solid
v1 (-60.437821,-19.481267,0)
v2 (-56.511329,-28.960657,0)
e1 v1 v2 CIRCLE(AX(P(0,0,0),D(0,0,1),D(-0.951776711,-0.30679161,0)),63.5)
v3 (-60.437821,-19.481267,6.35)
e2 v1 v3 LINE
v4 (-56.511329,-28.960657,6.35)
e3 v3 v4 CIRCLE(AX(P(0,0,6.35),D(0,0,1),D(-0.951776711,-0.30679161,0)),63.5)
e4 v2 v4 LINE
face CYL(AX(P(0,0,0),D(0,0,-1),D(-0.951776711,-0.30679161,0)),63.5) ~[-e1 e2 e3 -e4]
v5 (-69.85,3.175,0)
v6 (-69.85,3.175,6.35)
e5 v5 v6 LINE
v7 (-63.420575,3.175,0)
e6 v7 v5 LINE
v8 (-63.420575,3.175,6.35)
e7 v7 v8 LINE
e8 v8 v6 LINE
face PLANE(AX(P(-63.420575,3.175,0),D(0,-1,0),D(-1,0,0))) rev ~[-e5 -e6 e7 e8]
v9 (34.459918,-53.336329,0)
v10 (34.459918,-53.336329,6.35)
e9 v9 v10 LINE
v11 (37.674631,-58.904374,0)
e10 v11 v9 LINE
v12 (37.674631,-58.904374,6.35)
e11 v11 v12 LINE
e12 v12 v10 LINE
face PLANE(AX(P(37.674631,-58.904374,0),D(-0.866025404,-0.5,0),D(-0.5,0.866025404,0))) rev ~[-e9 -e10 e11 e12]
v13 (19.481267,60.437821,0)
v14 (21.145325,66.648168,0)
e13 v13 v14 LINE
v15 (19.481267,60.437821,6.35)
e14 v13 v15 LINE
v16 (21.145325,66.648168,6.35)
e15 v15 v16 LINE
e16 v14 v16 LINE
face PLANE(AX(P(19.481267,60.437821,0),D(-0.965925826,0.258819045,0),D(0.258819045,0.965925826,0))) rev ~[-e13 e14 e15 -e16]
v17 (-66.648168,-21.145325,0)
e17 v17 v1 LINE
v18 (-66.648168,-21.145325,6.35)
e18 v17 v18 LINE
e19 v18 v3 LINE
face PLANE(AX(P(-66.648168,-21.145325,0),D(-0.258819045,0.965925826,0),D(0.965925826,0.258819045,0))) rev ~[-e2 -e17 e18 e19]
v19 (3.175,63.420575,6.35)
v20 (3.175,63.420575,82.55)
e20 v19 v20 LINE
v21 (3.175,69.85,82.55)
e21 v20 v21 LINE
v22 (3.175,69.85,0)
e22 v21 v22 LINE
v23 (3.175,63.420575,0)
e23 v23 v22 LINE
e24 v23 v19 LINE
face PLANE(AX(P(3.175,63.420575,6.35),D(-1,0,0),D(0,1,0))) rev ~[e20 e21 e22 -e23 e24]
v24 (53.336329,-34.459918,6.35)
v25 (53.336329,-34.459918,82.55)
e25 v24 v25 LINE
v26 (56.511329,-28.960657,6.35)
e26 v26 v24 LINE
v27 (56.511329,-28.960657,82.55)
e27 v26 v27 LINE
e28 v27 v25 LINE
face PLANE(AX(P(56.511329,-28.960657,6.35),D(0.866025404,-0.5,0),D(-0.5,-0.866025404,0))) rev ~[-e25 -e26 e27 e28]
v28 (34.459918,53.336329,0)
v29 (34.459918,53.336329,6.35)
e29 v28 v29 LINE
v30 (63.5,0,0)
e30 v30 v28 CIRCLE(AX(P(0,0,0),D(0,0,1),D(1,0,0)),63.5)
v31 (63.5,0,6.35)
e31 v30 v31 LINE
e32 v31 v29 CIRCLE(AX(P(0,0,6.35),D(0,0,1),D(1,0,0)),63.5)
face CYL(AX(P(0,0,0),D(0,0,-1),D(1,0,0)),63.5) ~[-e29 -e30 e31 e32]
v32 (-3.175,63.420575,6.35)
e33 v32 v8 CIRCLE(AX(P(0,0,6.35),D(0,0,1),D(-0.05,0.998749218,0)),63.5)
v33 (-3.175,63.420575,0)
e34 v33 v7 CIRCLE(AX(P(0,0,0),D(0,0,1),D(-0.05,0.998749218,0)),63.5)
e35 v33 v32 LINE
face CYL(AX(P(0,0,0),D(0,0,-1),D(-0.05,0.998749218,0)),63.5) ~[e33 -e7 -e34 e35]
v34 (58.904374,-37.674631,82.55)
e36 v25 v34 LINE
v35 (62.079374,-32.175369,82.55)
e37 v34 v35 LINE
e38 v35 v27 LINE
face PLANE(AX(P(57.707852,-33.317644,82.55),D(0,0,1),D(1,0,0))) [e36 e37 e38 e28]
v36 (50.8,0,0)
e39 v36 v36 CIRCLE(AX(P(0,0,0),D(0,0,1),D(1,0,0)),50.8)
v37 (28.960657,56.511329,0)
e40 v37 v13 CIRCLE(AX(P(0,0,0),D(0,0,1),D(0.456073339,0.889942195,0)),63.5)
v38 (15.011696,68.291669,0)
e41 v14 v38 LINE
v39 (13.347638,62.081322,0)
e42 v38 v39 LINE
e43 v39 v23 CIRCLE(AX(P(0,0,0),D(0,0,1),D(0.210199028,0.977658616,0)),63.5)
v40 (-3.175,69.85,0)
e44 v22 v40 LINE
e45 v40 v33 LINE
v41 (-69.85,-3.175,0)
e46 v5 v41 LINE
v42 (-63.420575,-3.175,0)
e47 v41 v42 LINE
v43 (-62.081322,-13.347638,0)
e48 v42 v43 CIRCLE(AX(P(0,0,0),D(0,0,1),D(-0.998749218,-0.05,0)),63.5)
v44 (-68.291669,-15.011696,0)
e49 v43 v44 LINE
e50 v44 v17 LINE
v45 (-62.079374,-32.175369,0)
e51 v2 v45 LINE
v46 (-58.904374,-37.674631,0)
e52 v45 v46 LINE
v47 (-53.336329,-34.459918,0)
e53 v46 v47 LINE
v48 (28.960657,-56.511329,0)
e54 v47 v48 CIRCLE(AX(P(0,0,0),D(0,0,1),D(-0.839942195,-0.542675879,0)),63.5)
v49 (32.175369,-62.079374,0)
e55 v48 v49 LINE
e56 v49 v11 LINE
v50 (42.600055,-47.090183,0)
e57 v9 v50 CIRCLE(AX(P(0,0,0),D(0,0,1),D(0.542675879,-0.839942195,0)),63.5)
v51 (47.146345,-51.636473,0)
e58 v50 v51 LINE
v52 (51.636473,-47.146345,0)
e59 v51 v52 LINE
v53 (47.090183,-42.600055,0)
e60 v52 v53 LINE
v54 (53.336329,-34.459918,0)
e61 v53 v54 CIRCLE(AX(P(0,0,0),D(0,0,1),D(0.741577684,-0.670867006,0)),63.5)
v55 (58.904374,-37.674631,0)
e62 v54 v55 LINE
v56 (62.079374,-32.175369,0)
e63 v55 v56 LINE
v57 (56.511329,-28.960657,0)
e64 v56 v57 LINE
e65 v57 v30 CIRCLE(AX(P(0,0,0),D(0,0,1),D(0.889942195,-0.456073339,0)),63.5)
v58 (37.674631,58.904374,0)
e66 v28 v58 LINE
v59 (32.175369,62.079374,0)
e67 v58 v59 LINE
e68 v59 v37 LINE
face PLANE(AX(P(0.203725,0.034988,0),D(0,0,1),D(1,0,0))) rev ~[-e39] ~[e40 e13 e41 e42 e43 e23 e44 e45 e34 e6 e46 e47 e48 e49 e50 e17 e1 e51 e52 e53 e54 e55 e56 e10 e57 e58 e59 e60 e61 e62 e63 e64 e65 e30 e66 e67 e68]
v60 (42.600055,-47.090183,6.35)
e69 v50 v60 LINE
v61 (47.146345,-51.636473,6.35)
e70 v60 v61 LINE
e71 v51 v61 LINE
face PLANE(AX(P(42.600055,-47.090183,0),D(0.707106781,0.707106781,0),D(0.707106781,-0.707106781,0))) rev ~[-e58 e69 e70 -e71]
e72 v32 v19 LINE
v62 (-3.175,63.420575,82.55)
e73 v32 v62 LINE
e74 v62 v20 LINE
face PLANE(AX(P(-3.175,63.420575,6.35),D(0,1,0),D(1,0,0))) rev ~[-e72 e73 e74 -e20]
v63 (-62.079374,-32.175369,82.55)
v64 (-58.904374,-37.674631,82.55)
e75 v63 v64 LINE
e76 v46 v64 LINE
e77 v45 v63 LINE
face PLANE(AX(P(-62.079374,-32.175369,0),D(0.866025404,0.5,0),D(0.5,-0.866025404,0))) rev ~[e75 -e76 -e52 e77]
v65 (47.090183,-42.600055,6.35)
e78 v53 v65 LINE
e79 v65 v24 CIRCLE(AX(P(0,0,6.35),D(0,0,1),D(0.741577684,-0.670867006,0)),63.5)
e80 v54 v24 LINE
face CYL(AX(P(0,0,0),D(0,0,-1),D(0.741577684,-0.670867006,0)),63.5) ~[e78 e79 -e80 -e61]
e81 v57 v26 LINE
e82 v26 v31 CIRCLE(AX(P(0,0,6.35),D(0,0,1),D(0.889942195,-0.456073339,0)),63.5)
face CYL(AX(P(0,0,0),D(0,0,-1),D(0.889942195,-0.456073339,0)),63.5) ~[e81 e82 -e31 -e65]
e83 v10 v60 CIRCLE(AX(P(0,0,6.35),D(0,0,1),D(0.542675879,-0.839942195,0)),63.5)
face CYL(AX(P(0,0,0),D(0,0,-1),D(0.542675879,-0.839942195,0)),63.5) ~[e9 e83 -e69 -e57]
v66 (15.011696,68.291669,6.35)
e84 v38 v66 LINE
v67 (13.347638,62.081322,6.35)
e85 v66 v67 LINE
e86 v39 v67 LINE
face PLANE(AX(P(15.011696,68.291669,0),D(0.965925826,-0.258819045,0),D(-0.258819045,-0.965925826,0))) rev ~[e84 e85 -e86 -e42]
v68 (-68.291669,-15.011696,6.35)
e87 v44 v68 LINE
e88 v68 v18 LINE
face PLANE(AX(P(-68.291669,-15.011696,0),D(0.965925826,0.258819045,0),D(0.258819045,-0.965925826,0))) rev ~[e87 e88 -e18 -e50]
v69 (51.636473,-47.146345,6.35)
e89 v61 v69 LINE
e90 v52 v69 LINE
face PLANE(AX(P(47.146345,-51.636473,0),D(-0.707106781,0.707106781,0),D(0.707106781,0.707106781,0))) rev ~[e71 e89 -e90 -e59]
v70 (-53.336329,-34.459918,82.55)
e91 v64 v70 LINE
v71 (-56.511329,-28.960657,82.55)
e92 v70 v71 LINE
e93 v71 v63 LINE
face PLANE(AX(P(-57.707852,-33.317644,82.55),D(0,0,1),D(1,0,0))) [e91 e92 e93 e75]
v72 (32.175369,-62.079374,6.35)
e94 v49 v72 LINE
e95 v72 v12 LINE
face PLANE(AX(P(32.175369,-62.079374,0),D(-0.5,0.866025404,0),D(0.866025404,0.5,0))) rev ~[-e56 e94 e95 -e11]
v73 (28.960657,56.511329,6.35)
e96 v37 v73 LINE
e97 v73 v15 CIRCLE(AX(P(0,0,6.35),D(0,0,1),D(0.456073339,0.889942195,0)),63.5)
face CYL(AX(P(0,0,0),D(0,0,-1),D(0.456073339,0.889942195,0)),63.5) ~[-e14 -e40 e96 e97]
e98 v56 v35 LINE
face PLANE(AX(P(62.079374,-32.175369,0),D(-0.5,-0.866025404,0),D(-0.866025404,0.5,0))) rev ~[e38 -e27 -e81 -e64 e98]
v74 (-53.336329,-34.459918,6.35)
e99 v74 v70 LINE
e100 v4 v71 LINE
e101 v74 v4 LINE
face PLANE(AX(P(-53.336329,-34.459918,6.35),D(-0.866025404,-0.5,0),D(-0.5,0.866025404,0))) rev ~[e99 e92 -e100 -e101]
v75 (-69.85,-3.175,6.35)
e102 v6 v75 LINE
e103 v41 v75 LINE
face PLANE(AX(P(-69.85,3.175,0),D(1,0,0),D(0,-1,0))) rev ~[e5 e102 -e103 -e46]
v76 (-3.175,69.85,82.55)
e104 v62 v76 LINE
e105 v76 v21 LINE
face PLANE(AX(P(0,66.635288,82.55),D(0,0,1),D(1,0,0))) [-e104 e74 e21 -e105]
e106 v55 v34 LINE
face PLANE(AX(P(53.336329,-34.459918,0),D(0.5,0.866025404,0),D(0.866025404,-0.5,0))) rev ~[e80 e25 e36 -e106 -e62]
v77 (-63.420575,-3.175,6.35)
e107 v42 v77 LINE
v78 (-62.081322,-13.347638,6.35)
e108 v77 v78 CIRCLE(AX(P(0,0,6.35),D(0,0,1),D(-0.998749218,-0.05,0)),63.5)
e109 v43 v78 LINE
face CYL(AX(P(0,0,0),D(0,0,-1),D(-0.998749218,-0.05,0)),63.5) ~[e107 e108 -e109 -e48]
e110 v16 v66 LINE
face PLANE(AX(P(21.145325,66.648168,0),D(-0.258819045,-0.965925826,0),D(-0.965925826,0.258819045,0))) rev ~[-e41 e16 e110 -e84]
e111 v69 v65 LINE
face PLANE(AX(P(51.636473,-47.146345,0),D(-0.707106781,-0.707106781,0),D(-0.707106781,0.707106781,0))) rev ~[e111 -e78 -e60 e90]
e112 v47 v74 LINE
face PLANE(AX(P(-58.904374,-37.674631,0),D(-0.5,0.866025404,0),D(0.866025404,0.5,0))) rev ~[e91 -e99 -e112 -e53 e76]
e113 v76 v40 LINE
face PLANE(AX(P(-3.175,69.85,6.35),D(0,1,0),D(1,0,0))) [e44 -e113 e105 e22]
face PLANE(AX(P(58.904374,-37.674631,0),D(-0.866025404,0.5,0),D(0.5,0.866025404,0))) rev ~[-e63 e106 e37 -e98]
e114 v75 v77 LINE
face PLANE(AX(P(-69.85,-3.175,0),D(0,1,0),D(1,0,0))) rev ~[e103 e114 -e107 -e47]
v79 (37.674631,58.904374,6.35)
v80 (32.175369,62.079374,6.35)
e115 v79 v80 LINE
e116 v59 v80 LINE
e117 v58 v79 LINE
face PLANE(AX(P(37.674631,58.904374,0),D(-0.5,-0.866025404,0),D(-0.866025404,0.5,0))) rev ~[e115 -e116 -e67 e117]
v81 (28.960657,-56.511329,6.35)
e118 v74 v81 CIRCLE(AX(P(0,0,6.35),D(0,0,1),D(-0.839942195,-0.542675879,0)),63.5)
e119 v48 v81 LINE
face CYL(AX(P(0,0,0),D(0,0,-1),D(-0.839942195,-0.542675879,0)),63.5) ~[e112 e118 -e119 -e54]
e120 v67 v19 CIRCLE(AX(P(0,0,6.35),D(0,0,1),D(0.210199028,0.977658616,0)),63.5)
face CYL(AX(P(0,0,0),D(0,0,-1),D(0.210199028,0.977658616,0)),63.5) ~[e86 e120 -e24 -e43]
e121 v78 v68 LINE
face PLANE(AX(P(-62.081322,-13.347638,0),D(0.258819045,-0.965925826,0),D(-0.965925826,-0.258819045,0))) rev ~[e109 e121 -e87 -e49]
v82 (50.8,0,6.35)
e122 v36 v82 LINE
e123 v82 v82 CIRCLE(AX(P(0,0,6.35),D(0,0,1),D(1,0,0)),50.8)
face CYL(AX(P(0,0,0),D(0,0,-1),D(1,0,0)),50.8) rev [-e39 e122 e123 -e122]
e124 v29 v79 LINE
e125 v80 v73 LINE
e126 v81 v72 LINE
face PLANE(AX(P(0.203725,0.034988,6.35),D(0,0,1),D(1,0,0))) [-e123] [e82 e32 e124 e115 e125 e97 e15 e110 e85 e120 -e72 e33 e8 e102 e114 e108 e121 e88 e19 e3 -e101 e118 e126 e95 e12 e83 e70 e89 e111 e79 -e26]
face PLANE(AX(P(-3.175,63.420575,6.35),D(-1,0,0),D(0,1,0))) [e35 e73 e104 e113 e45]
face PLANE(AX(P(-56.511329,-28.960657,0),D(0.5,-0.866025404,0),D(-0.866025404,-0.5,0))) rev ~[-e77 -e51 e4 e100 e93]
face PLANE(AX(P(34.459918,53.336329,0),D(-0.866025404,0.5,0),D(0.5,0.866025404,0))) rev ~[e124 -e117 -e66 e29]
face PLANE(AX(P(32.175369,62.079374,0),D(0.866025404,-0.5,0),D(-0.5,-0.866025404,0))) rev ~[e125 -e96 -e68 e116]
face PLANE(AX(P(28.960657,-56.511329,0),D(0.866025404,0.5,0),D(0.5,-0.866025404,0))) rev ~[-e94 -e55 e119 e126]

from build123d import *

# Parameters (mm, degrees)
F0_R     = 50.8
F1_DEPTH = 6.35
F2_W     = 6.35
F2_H     = 6.4294246715
F3_DEPTH = 76.2


# Not quite as in the source:
# - a feature names something its author has since deleted; it is built from what else it names


with BuildPart() as f1:
    # F0 (on Top) → F1 (new body)
    with BuildSketch(Plane.XY):
        with BuildLine():
            ThreePointArc((56.5113293571, -28.9606570072), (61.7281111576, -14.895982442), (63.5, 0))
            ThreePointArc((63.5, 0), (55.7694128237, 30.3648249344), (34.4599183213, 53.3363293571))
            Line((34.4599183213, 53.3363293571), (31.324630657, 47.9058518263))
            Line((31.324630657, 47.9058518263), (25.825369343, 51.0808518263))
            Line((25.825369343, 51.0808518263), (28.9606570072, 56.5113293571))
            ThreePointArc((28.9606570072, 56.5113293571), (24.3003979552, 58.6663503145), (19.4812672448, 60.4378211597))
            Line((19.4812672448, 60.4378211597), (17.8583229261, 54.3809105042))
            Line((17.8583229261, 54.3809105042), (11.7246939291, 56.0244114406))
            Line((11.7246939291, 56.0244114406), (13.3476382479, 62.0813220961))
            ThreePointArc((13.3476382479, 62.0813220961), (8.288413206, 62.9567486972), (3.175, 63.4205753285))
            Line((3.175, 63.4205753285), (3.175, 57.15))
            Line((3.175, 57.15), (-3.175, 57.15))
            Line((-3.175, 57.15), (-3.175, 63.4205753285))
            ThreePointArc((-3.175, 63.4205753285), (-44.9012806053, 44.9012806053), (-63.4205753285, 3.175))
            Line((-63.4205753285, 3.175), (-57.15, 3.175))
            Line((-57.15, 3.175), (-57.15, -3.175))
            Line((-57.15, -3.175), (-63.4205753285, -3.175))
            ThreePointArc((-63.4205753285, -3.175), (-62.9567486972, -8.288413206), (-62.0813220961, -13.3476382479))
            Line((-62.0813220961, -13.3476382479), (-56.0244114406, -11.7246939291))
            Line((-56.0244114406, -11.7246939291), (-54.3809105042, -17.8583229261))
            Line((-54.3809105042, -17.8583229261), (-60.4378211597, -19.4812672448))
            ThreePointArc((-60.4378211597, -19.4812672448), (-58.6663503145, -24.3003979552), (-56.5113293571, -28.9606570072))
            Line((-56.5113293571, -28.9606570072), (-51.0808518263, -25.825369343))
            Line((-51.0808518263, -25.825369343), (-47.9058518263, -31.324630657))
            Line((-47.9058518263, -31.324630657), (-53.3363293571, -34.4599183213))
            ThreePointArc((-53.3363293571, -34.4599183213), (-16.435009364, -61.3362899694), (28.9606570072, -56.5113293571))
            Line((28.9606570072, -56.5113293571), (25.825369343, -51.0808518263))
            Line((25.825369343, -51.0808518263), (31.324630657, -47.9058518263))
            Line((31.324630657, -47.9058518263), (34.4599183213, -53.3363293571))
            ThreePointArc((34.4599183213, -53.3363293571), (38.6563507421, -50.3779371085), (42.6000548513, -47.0901829118))
            Line((42.6000548513, -47.0901829118), (38.1660885145, -42.6562165751))
            Line((38.1660885145, -42.6562165751), (42.6562165751, -38.1660885145))
            Line((42.6562165751, -38.1660885145), (47.0901829118, -42.6000548513))
            ThreePointArc((47.0901829118, -42.6000548513), (50.3779371085, -38.6563507421), (53.3363293571, -34.4599183213))
            Line((53.3363293571, -34.4599183213), (47.9058518263, -31.324630657))
            Line((47.9058518263, -31.324630657), (51.0808518263, -25.825369343))
            Line((51.0808518263, -25.825369343), (56.5113293571, -28.9606570072))
        make_face()
        Circle(F0_R, mode=Mode.SUBTRACT)
        with BuildLine():
            ThreePointArc((-3.175, 63.4205753285), (0, 63.5), (3.175, 63.4205753285))
            Line((3.175, 63.4205753285), (3.175, 69.85))
            Line((3.175, 69.85), (-3.175, 69.85))
            Line((-3.175, 69.85), (-3.175, 63.4205753285))
        make_face()
        with BuildLine():
            Line((3.175, 57.15), (3.175, 63.4205753285))
            ThreePointArc((3.175, 63.4205753285), (0, 63.5), (-3.175, 63.4205753285))
            Line((-3.175, 63.4205753285), (-3.175, 57.15))
            Line((-3.175, 57.15), (3.175, 57.15))
        make_face()
        with BuildLine():
            Line((17.8583229261, 54.3809105042), (19.4812672448, 60.4378211597))
            ThreePointArc((19.4812672448, 60.4378211597), (16.435009364, 61.3362899694), (13.3476382479, 62.0813220961))
            Line((13.3476382479, 62.0813220961), (11.7246939291, 56.0244114406))
            Line((11.7246939291, 56.0244114406), (17.8583229261, 54.3809105042))
        make_face()
        with BuildLine():
            ThreePointArc((13.3476382479, 62.0813220961), (16.435009364, 61.3362899694), (19.4812672448, 60.4378211597))
            Line((19.4812672448, 60.4378211597), (21.1453247989, 66.6481684981))
            Line((21.1453247989, 66.6481684981), (15.0116958019, 68.2916694345))
            Line((15.0116958019, 68.2916694345), (13.3476382479, 62.0813220961))
        make_face()
        with BuildLine():
            ThreePointArc((28.9606570072, 56.5113293571), (31.75, 54.9926131403), (34.4599183213, 53.3363293571))
            Line((34.4599183213, 53.3363293571), (37.674630657, 58.9043744543))
            Line((37.674630657, 58.9043744543), (32.175369343, 62.0793744543))
            Line((32.175369343, 62.0793744543), (28.9606570072, 56.5113293571))
        make_face()
        with BuildLine():
            Line((31.324630657, 47.9058518263), (34.4599183213, 53.3363293571))
            ThreePointArc((34.4599183213, 53.3363293571), (31.75, 54.9926131403), (28.9606570072, 56.5113293571))
            Line((28.9606570072, 56.5113293571), (25.825369343, 51.0808518263))
            Line((25.825369343, 51.0808518263), (31.324630657, 47.9058518263))
        make_face()
        with BuildLine():
            Line((62.0793744543, -32.175369343), (56.5113293571, -28.9606570072))
            ThreePointArc((56.5113293571, -28.9606570072), (54.9926131403, -31.75), (53.3363293571, -34.4599183213))
            Line((53.3363293571, -34.4599183213), (58.9043744543, -37.674630657))
            Line((58.9043744543, -37.674630657), (62.0793744543, -32.175369343))
        make_face()
        with BuildLine():
            ThreePointArc((53.3363293571, -34.4599183213), (54.9926131403, -31.75), (56.5113293571, -28.9606570072))
            Line((56.5113293571, -28.9606570072), (51.0808518263, -25.825369343))
            Line((51.0808518263, -25.825369343), (47.9058518263, -31.324630657))
            Line((47.9058518263, -31.324630657), (53.3363293571, -34.4599183213))
        make_face()
        with BuildLine():
            Line((51.6364726961, -47.1463446356), (47.0901829118, -42.6000548513))
            ThreePointArc((47.0901829118, -42.6000548513), (44.9012806053, -44.9012806053), (42.6000548513, -47.0901829118))
            Line((42.6000548513, -47.0901829118), (47.1463446356, -51.6364726961))
            Line((47.1463446356, -51.6364726961), (51.6364726961, -47.1463446356))
        make_face()
        with BuildLine():
            ThreePointArc((42.6000548513, -47.0901829118), (44.9012806053, -44.9012806053), (47.0901829118, -42.6000548513))
            Line((47.0901829118, -42.6000548513), (42.6562165751, -38.1660885145))
            Line((42.6562165751, -38.1660885145), (38.1660885145, -42.6562165751))
            Line((38.1660885145, -42.6562165751), (42.6000548513, -47.0901829118))
        make_face()
        with BuildLine():
            ThreePointArc((28.9606570072, -56.5113293571), (31.75, -54.9926131403), (34.4599183213, -53.3363293571))
            Line((34.4599183213, -53.3363293571), (31.324630657, -47.9058518263))
            Line((31.324630657, -47.9058518263), (25.825369343, -51.0808518263))
            Line((25.825369343, -51.0808518263), (28.9606570072, -56.5113293571))
        make_face()
        with BuildLine():
            Line((37.674630657, -58.9043744543), (34.4599183213, -53.3363293571))
            ThreePointArc((34.4599183213, -53.3363293571), (31.75, -54.9926131403), (28.9606570072, -56.5113293571))
            Line((28.9606570072, -56.5113293571), (32.175369343, -62.0793744543))
            Line((32.175369343, -62.0793744543), (37.674630657, -58.9043744543))
        make_face()
        with BuildLine():
            Line((-58.9043744543, -37.674630657), (-53.3363293571, -34.4599183213))
            ThreePointArc((-53.3363293571, -34.4599183213), (-54.9926131403, -31.75), (-56.5113293571, -28.9606570072))
            Line((-56.5113293571, -28.9606570072), (-62.0793744543, -32.175369343))
            Line((-62.0793744543, -32.175369343), (-58.9043744543, -37.674630657))
        make_face()
        with BuildLine():
            ThreePointArc((-60.4378211597, -19.4812672448), (-61.3362899694, -16.435009364), (-62.0813220961, -13.3476382479))
            Line((-62.0813220961, -13.3476382479), (-68.2916694345, -15.0116958019))
            Line((-68.2916694345, -15.0116958019), (-66.6481684981, -21.1453247989))
            Line((-66.6481684981, -21.1453247989), (-60.4378211597, -19.4812672448))
        make_face()
        with BuildLine():
            ThreePointArc((-63.4205753285, -3.175), (-63.5, 0), (-63.4205753285, 3.175))
            Line((-63.4205753285, 3.175), (-69.85, 3.175))
            Line((-69.85, 3.175), (-69.85, -3.175))
            Line((-69.85, -3.175), (-63.4205753285, -3.175))
        make_face()
        with BuildLine():
            Line((-57.15, 3.175), (-63.4205753285, 3.175))
            ThreePointArc((-63.4205753285, 3.175), (-63.5, 0), (-63.4205753285, -3.175))
            Line((-63.4205753285, -3.175), (-57.15, -3.175))
            Line((-57.15, -3.175), (-57.15, 3.175))
        make_face()
        with BuildLine():
            Line((-56.0244114406, -11.7246939291), (-62.0813220961, -13.3476382479))
            ThreePointArc((-62.0813220961, -13.3476382479), (-61.3362899694, -16.435009364), (-60.4378211597, -19.4812672448))
            Line((-60.4378211597, -19.4812672448), (-54.3809105042, -17.8583229261))
            Line((-54.3809105042, -17.8583229261), (-56.0244114406, -11.7246939291))
        make_face()
        with BuildLine():
            ThreePointArc((-56.5113293571, -28.9606570072), (-54.9926131403, -31.75), (-53.3363293571, -34.4599183213))
            Line((-53.3363293571, -34.4599183213), (-47.9058518263, -31.324630657))
            Line((-47.9058518263, -31.324630657), (-51.0808518263, -25.825369343))
            Line((-51.0808518263, -25.825369343), (-56.5113293571, -28.9606570072))
        make_face()
    extrude(amount=F1_DEPTH)

    # F2 (on face) → F3 (join)
    with BuildSketch(Plane.XY.offset(6.35)):
        with Locations((0, 66.6352876643)):
            Rectangle(F2_W, F2_H)
        Polygon((62.0793744543, -32.175369343), (56.5113293571, -28.9606570072), (53.3363293571, -34.4599183213), (58.9043744543, -37.674630657), align=None)
        Polygon((-53.3363293571, -34.4599183213), (-56.5113293571, -28.9606570072), (-62.0793744543, -32.175369343), (-58.9043744543, -37.674630657), align=None)
    extrude(amount=F3_DEPTH)


solid = f1.part
